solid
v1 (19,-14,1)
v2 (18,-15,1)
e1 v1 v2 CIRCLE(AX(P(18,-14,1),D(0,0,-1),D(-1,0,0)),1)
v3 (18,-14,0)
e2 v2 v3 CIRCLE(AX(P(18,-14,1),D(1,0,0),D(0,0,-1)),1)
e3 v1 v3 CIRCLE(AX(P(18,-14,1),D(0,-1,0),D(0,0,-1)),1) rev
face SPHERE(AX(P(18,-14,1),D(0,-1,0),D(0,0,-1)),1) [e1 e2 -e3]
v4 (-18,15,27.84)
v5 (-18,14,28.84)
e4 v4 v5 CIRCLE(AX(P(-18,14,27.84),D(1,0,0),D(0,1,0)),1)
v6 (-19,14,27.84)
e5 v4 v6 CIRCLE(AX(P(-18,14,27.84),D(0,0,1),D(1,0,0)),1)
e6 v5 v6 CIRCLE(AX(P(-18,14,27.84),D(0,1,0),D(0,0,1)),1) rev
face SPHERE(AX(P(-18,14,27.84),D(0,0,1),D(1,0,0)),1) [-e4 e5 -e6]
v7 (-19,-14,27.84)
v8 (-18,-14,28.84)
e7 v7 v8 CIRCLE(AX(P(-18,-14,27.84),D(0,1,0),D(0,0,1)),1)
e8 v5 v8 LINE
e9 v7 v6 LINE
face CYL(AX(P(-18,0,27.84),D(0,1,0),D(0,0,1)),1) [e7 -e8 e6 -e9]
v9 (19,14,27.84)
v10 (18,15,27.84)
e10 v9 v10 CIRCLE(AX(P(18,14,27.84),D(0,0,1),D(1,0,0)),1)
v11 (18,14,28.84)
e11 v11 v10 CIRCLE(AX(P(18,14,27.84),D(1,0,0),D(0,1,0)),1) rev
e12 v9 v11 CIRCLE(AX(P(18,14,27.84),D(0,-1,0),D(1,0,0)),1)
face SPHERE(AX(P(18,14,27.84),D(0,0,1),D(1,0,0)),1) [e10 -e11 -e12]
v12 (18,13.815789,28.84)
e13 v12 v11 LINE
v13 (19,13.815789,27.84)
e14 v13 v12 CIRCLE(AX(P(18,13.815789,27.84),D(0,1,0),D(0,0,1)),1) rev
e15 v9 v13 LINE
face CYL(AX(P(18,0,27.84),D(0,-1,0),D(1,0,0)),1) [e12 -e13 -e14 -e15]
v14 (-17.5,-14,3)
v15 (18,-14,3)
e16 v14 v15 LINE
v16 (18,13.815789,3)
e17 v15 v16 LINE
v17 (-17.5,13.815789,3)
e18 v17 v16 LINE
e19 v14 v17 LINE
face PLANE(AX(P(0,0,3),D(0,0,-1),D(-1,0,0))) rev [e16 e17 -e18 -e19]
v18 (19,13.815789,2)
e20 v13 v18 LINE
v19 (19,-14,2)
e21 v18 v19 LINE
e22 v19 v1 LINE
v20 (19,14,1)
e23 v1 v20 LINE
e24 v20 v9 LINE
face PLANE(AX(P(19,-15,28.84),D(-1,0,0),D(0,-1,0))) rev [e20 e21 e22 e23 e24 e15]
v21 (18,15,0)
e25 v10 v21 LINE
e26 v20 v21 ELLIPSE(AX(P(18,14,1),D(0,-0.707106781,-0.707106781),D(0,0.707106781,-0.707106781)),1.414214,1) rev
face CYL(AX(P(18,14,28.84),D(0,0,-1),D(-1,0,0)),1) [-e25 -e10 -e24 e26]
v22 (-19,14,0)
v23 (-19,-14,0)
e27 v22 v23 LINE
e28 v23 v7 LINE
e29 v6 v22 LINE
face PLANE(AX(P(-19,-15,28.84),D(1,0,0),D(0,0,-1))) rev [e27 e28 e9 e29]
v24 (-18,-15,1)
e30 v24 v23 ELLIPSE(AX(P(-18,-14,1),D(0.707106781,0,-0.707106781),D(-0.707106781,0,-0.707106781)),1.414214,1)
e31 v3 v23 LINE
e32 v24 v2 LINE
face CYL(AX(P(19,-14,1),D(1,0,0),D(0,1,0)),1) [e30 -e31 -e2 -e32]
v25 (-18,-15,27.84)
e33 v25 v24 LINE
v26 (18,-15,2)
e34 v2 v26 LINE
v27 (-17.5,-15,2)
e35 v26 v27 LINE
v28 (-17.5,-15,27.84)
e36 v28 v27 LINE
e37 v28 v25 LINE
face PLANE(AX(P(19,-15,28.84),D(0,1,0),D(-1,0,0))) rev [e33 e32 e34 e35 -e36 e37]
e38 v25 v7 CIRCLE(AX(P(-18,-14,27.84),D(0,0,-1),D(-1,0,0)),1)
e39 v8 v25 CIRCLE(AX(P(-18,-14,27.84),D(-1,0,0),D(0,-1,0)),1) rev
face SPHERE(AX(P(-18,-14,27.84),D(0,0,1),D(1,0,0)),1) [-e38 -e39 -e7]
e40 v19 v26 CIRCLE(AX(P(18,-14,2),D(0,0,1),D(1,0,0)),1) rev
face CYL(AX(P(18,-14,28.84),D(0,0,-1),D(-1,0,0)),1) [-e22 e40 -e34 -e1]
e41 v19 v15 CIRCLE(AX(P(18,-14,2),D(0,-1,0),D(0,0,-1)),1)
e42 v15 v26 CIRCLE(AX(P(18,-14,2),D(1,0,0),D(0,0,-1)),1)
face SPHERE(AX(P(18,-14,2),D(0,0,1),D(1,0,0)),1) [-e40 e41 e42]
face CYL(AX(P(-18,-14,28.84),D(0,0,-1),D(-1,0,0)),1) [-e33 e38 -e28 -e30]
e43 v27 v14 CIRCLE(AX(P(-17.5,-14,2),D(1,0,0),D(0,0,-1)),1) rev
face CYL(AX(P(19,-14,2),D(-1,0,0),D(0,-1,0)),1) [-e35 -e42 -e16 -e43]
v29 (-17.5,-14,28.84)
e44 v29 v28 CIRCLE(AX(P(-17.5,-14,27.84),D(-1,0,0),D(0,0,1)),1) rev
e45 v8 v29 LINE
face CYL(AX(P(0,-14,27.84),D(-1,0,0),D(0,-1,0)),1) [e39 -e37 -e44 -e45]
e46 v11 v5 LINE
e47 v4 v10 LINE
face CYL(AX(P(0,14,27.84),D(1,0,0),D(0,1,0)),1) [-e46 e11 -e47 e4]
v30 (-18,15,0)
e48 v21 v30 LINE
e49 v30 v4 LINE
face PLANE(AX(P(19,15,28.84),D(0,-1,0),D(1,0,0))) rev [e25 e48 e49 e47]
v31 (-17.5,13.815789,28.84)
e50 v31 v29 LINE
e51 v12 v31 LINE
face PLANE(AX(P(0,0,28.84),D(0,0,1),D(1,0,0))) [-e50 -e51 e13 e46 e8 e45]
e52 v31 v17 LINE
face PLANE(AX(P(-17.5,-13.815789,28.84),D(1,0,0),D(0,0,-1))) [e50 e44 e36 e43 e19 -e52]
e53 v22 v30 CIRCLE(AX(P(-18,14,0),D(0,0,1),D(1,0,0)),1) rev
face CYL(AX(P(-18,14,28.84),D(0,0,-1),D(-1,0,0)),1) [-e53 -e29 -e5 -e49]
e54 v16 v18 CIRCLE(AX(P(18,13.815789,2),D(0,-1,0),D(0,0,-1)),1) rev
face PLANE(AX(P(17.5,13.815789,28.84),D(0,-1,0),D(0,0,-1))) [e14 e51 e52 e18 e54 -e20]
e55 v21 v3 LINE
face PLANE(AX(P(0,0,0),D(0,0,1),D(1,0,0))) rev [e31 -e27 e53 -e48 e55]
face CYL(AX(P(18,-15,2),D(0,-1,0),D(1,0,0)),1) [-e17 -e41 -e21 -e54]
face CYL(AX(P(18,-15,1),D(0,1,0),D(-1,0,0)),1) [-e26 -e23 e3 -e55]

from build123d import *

# Parameters (mm, degrees)
SKETCH1_W           = 38
SKETCH1_H           = 30
SKETCH1_W_2         = 35
SKETCH1_H_2         = 27.631578948
BOSS_EXTRUDE1_DEPTH = 28.84
FILLET1_R           = 1
SKETCH2_W           = 35
SKETCH2_H           = 27.631578948
BOSS_EXTRUDE2_DEPTH = 3
SKETCH3_W           = 36.5
SKETCH3_H           = 28.815789474
CUT_EXTRUDE1_DEPTH  = 36.407705376
FILLET2_R           = 1


with BuildPart() as part:
    # Sketch1 → Boss-Extrude1 (new body)
    with BuildSketch(Plane.XY):
        Rectangle(SKETCH1_W, SKETCH1_H)
        Rectangle(SKETCH1_W_2, SKETCH1_H_2, mode=Mode.SUBTRACT)
    extrude(amount=BOSS_EXTRUDE1_DEPTH)

    # Fillet1
    fillet1_edges = [part.edges().sort_by_distance(p)[0] for p in [
        (19, 0, 28.84),
        (0, 15, 28.84),
        (-19, 0, 28.84),
        (0, -15, 28.84),
    ]]
    fillet(fillet1_edges, radius=FILLET1_R)

    # Sketch2 → Boss-Extrude2 (add)
    with BuildSketch(Plane(origin=(0, 0, 0), x_dir=(-1, 0, 0), z_dir=(0, 0, -1))):
        Rectangle(SKETCH2_W, SKETCH2_H)
    extrude(amount=-BOSS_EXTRUDE2_DEPTH)

    # Sketch3 → Cut-Extrude1 (cut, through all)
    with BuildSketch(Plane(origin=(0, 0, 3), x_dir=(-1, 0, 0), z_dir=(0, 0, -1))):
        with Locations((-0.75, -0.592105263)):
            Rectangle(SKETCH3_W, SKETCH3_H)
    extrude(amount=-CUT_EXTRUDE1_DEPTH, mode=Mode.SUBTRACT)

    # Fillet2
    # the kernel refuses this fillet: 1 mm, written as the material it takes off along each edge
    with BuildSketch(Plane(origin=(-18, -14, 27.84), x_dir=(-1, 0, 0), z_dir=(0, -1, 0))) as fillet2_piece_1_section:
        Polygon((0, 0), (FILLET2_R * 1.02, 0), (FILLET2_R * 1.02, -FILLET2_R * 1.02), (0, -FILLET2_R * 1.02), align=None)
    fillet2_piece_1 = extrude(amount=FILLET2_R * 1.02, mode=Mode.PRIVATE)
    fillet2_piece_1 = fillet2_piece_1 - Plane(origin=(-18, -14, 27.84), x_dir=(0.7071067811865475, 0, -0.7071067811865475), z_dir=(0, -1, 0)) * Sphere(FILLET2_R, mode=Mode.PRIVATE)
    add(fillet2_piece_1, mode=Mode.SUBTRACT)
    with BuildSketch(Plane(origin=(-18, 14, 27.84), x_dir=(-1, 0, 0), z_dir=(0, 1, 0))) as fillet2_piece_2_section:
        Polygon((0, 0), (FILLET2_R * 1.02, 0), (FILLET2_R * 1.02, FILLET2_R * 1.02), (0, FILLET2_R * 1.02), align=None)
    fillet2_piece_2 = extrude(amount=FILLET2_R * 1.02, mode=Mode.PRIVATE)
    fillet2_piece_2 = fillet2_piece_2 - Plane(origin=(-18, 14, 27.84), x_dir=(0.7071067811865475, 0, -0.7071067811865475), z_dir=(0, 1, 0)) * Sphere(FILLET2_R, mode=Mode.PRIVATE)
    add(fillet2_piece_2, mode=Mode.SUBTRACT)
    with BuildSketch(Plane(origin=(18, 14, 27.84), x_dir=(0, 1, 0), z_dir=(1, 0, 0))) as fillet2_piece_3_section:
        Polygon((0, 0), (FILLET2_R * 1.02, 0), (FILLET2_R * 1.02, FILLET2_R * 1.02), (0, FILLET2_R * 1.02), align=None)
    fillet2_piece_3 = extrude(amount=FILLET2_R * 1.02, mode=Mode.PRIVATE)
    fillet2_piece_3 = fillet2_piece_3 - Plane(origin=(18, 14, 27.84), x_dir=(0, -0.7071067811865475, -0.7071067811865475), z_dir=(1, 0, 0)) * Sphere(FILLET2_R, mode=Mode.PRIVATE)
    add(fillet2_piece_3, mode=Mode.SUBTRACT)
    with BuildSketch(Plane(origin=(18, -14, 1), x_dir=(1, 0, 0), z_dir=(0, -1, 0))) as fillet2_piece_4_section:
        Polygon((0, 0), (FILLET2_R * 1.02, 0), (FILLET2_R * 1.02, -FILLET2_R * 1.02), (0, -FILLET2_R * 1.02), align=None)
    fillet2_piece_4 = extrude(amount=FILLET2_R * 1.02, mode=Mode.PRIVATE)
    fillet2_piece_4 = fillet2_piece_4 - Plane(origin=(18, -14, 1), x_dir=(-0.7071067811865475, 0, 0.7071067811865475), z_dir=(0, -1, 0)) * Sphere(FILLET2_R, mode=Mode.PRIVATE)
    add(fillet2_piece_4, mode=Mode.SUBTRACT)
    with BuildSketch(Plane(origin=(18, -14, 2), x_dir=(1, 0, 0), z_dir=(0, -1, 0))) as fillet2_piece_5_section:
        Polygon((0, 0), (FILLET2_R * 1.02, 0), (FILLET2_R * 1.02, FILLET2_R * 1.02), (0, FILLET2_R * 1.02), align=None)
    fillet2_piece_5 = extrude(amount=FILLET2_R * 1.02, mode=Mode.PRIVATE)
    fillet2_piece_5 = fillet2_piece_5 - Plane(origin=(18, -14, 2), x_dir=(-0.7071067811865475, 0, -0.7071067811865475), z_dir=(0, -1, 0)) * Sphere(FILLET2_R, mode=Mode.PRIVATE)
    add(fillet2_piece_5, mode=Mode.SUBTRACT)
    with BuildSketch(Plane(origin=(19, 15, -2.5), x_dir=(0, -1, 0), z_dir=(0, 0, 1)), Plane(origin=(-19, 15, -2.5), x_dir=(1, 0, 0), z_dir=(0, 0, 1))) as fillet2_piece_6:
        with BuildLine():
            CenterArc((FILLET2_R, -FILLET2_R), FILLET2_R, 90, 90)
            Line((0, -FILLET2_R), (0, 0))
            Line((0, 0), (FILLET2_R, 0))
        make_face()
    extrude(amount=30.34, mode=Mode.SUBTRACT)
    with BuildSketch(Plane(origin=(-19, -15, -2.5), x_dir=(1, 0, 0), z_dir=(0, 0, 1))) as fillet2_piece_7:
        with BuildLine():
            CenterArc((FILLET2_R, FILLET2_R), FILLET2_R, 180, 90)
            Line((0, FILLET2_R), (0, 0))
            Line((0, 0), (FILLET2_R, 0))
        make_face()
    extrude(amount=30.34, mode=Mode.SUBTRACT)
    with BuildSketch(Plane(origin=(19, 17.5, 0), x_dir=(0, 0, 1), z_dir=(0, -1, 0))) as fillet2_piece_8:
        with BuildLine():
            CenterArc((FILLET2_R, FILLET2_R), FILLET2_R, 180, 90)
            Line((0, FILLET2_R), (0, 0))
            Line((0, 0), (FILLET2_R, 0))
        make_face()
    extrude(amount=31.5, mode=Mode.SUBTRACT)
    with BuildSketch(Plane(origin=(18, -15, 0), x_dir=(0, 0, 1), z_dir=(-1, 0, 0))) as fillet2_piece_9:
        with BuildLine():
            CenterArc((FILLET2_R, FILLET2_R), FILLET2_R, 180, 90)
            Line((0, FILLET2_R), (0, 0))
            Line((0, 0), (FILLET2_R, 0))
        make_face()
    extrude(amount=39.5, mode=Mode.SUBTRACT)
    with BuildSketch(Plane(origin=(19, -15, 1), x_dir=(-1, 0, 0), z_dir=(0, 0, 1))) as fillet2_piece_10:
        with BuildLine():
            CenterArc((FILLET2_R, -FILLET2_R), FILLET2_R, 90, 90)
            Line((0, -FILLET2_R), (0, 0))
            Line((0, 0), (FILLET2_R, 0))
        make_face()
    extrude(amount=1, mode=Mode.SUBTRACT)
    with BuildSketch(Plane(origin=(19, 13.815789474, 3), x_dir=(0, 0, -1), z_dir=(0, -1, 0))) as fillet2_piece_11:
        with BuildLine():
            CenterArc((FILLET2_R, -FILLET2_R), FILLET2_R, 90, 90)
            Line((0, -FILLET2_R), (0, 0))
            Line((0, 0), (FILLET2_R, 0))
        make_face()
    extrude(amount=27.815789474, mode=Mode.SUBTRACT)
    with BuildSketch(Plane(origin=(18, -15, 3), x_dir=(0, 0, -1), z_dir=(-1, 0, 0))) as fillet2_piece_12:
        with BuildLine():
            CenterArc((FILLET2_R, -FILLET2_R), FILLET2_R, 90, 90)
            Line((0, -FILLET2_R), (0, 0))
            Line((0, 0), (FILLET2_R, 0))
        make_face()
    extrude(amount=35.5, mode=Mode.SUBTRACT)


solid = part.part
